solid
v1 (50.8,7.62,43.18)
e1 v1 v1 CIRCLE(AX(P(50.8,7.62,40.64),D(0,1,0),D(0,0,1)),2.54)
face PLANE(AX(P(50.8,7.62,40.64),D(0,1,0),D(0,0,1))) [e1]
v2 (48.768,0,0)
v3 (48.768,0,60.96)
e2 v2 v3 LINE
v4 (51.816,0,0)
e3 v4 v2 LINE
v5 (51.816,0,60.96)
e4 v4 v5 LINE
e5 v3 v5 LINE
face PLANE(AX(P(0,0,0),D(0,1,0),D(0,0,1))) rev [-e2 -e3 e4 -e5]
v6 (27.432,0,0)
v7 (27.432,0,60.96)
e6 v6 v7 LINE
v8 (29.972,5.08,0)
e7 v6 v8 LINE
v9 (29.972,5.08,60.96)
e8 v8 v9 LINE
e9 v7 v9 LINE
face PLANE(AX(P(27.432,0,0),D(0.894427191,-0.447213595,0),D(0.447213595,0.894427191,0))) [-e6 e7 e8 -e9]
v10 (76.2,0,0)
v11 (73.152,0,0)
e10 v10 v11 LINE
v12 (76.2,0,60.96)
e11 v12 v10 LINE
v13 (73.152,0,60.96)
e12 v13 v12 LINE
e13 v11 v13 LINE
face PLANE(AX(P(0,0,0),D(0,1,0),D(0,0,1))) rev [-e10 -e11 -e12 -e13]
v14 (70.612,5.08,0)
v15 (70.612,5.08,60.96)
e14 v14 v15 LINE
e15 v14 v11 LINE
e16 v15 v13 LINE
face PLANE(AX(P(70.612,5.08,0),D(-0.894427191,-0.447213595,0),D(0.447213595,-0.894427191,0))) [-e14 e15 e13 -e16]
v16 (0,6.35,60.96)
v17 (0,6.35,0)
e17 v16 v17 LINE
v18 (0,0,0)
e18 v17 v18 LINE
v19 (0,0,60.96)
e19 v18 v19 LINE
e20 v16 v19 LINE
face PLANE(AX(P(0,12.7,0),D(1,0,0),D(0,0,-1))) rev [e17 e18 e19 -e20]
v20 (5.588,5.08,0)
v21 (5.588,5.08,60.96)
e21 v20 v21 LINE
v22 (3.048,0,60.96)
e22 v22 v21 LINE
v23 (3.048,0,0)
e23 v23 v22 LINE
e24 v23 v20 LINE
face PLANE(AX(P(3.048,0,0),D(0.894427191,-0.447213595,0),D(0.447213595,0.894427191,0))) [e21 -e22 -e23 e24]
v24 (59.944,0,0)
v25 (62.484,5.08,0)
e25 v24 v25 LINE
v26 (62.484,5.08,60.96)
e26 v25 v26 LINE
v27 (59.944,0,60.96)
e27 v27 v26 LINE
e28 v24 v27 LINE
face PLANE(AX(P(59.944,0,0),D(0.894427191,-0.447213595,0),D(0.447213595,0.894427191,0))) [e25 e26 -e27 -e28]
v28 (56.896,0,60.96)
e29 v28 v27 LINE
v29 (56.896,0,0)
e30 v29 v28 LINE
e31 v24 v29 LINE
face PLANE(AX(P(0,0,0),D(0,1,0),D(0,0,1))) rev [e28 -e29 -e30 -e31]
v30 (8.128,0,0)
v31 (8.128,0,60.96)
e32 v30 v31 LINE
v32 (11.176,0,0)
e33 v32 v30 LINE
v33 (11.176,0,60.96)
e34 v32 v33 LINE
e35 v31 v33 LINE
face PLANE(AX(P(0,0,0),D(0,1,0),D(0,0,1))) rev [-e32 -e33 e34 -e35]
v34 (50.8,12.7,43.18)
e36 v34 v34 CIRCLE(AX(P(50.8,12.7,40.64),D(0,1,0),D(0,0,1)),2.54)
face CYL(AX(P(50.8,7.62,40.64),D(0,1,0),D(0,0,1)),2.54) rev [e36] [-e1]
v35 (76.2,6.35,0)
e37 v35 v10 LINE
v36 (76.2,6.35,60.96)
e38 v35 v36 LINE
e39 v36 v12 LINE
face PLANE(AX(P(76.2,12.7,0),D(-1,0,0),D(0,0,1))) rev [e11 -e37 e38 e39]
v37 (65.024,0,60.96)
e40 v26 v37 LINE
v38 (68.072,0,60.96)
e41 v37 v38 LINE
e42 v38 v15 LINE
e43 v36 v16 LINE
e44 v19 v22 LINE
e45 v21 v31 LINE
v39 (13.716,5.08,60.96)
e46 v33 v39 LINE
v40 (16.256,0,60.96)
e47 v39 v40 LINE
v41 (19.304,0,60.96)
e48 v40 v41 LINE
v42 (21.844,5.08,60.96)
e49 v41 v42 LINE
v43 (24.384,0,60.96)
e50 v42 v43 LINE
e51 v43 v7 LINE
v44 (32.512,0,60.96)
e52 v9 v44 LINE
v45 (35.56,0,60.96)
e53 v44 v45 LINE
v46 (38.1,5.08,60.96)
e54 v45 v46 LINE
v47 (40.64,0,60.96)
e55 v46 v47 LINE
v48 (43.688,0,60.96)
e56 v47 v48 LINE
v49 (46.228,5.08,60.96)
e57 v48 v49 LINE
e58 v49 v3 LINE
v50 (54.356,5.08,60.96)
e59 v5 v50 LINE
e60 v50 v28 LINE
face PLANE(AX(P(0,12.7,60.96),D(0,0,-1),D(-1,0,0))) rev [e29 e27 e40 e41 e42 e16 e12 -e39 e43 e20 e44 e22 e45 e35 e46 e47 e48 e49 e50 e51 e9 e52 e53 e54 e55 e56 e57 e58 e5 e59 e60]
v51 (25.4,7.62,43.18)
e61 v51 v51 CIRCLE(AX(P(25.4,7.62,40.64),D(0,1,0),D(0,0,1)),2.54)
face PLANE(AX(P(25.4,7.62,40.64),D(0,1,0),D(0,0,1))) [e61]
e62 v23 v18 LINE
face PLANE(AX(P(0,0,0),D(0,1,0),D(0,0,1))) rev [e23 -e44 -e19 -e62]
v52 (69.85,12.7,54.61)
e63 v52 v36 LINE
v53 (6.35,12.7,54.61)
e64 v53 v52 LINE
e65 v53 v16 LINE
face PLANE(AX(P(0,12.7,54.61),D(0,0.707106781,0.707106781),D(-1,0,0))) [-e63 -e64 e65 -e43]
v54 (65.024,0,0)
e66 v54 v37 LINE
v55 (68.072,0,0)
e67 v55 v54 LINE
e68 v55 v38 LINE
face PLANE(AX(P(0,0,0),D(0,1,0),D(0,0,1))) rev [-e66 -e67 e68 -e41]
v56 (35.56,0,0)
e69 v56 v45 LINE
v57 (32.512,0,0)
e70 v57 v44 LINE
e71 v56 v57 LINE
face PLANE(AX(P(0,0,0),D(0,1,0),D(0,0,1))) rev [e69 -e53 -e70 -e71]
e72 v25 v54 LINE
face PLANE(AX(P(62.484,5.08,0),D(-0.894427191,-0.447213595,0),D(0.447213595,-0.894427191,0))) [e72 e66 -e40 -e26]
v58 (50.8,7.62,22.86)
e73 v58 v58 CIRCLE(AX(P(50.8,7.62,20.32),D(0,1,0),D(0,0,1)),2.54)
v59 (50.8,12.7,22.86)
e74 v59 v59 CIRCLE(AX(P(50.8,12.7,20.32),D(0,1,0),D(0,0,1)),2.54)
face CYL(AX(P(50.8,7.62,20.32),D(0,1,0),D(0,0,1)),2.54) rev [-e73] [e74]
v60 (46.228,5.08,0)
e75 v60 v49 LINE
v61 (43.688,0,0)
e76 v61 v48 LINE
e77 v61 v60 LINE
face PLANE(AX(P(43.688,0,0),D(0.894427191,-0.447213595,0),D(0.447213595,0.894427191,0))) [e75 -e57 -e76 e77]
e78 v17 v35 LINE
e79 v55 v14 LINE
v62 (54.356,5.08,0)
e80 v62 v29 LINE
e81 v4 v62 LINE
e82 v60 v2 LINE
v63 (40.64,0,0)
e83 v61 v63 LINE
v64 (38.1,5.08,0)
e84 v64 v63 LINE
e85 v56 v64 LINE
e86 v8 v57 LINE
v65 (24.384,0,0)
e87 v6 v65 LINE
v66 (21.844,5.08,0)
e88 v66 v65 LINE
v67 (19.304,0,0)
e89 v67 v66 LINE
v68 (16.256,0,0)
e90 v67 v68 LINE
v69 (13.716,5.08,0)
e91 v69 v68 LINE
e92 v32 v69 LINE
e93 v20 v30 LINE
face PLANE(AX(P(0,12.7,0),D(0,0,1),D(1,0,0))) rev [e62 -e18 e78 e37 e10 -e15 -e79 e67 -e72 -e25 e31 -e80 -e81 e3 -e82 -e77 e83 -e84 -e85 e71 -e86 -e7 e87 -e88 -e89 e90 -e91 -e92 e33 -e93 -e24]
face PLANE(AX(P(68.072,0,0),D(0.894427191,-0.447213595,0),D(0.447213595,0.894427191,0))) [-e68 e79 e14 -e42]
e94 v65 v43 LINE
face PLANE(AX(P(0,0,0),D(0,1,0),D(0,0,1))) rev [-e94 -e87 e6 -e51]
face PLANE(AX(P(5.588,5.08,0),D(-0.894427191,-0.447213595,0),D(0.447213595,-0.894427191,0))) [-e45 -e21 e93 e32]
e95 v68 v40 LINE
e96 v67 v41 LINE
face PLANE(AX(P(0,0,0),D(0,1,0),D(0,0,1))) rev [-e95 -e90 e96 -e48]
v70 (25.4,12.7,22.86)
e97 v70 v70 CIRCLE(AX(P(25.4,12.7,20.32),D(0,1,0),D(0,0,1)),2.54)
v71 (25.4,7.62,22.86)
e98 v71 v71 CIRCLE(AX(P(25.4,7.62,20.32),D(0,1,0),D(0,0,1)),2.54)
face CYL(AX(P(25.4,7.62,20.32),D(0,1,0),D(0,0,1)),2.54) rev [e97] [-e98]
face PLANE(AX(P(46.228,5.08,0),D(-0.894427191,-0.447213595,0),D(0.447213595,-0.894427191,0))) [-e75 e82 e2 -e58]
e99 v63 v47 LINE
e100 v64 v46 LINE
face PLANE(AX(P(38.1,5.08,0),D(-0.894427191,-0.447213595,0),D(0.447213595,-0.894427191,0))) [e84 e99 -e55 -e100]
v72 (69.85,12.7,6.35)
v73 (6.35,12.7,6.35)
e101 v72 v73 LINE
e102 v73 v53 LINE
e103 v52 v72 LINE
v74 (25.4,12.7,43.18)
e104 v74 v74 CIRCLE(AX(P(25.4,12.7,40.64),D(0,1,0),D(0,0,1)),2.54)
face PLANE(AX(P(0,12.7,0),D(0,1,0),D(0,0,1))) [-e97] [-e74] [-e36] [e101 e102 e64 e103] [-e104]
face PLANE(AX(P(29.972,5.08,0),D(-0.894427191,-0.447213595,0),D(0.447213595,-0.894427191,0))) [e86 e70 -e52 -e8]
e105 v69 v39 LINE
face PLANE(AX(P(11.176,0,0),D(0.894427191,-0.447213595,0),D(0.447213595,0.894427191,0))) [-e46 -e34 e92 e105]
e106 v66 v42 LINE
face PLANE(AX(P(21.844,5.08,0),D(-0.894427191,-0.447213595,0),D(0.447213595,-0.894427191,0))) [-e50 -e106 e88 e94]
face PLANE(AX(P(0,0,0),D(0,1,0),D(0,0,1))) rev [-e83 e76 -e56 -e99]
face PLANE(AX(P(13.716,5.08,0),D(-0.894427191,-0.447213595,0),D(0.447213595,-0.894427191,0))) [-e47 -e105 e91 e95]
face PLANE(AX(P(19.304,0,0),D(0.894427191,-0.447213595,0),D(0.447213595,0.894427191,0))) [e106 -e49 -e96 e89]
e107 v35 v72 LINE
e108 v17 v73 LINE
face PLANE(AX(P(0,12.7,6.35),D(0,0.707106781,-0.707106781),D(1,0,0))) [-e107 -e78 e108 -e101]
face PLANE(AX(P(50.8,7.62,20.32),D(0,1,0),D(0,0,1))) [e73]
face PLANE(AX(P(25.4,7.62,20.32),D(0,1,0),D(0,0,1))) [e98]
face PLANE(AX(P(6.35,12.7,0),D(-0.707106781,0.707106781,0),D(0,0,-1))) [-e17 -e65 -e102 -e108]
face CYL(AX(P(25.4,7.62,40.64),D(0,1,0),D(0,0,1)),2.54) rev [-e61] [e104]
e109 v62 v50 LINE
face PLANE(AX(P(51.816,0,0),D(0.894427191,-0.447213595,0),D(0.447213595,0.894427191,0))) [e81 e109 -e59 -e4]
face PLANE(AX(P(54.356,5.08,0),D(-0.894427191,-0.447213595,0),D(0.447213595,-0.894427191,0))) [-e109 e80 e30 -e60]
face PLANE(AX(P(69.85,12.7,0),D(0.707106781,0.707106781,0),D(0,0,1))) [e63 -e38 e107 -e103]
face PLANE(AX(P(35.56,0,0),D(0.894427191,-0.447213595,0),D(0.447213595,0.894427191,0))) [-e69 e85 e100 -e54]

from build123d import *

# Parameters (mm, degrees)
SKETCH1_W           = 76.2
SKETCH1_H           = 60.96
BOSS_EXTRUDE1_DEPTH = 12.7
CHAMFER1_SIZE       = 6.35
CUT_EXTRUDE1_DEPTH  = 99.406562789
CRVPATTERN1_DEPTH   = 60.96
SKETCH3_R           = 2.54
CUT_EXTRUDE2_DEPTH  = 5.08


# Read off the part's stored shape, not the designer's step: CrvPattern1
with BuildPart() as part:
    # Sketch1 → Boss-Extrude1 (new body)
    with BuildSketch(Plane(origin=(0, 0, 0), x_dir=(1, 0, 0), z_dir=(0, 1, 0))):
        with Locations((38.1, -30.48)):
            Rectangle(SKETCH1_W, SKETCH1_H)
    extrude(amount=BOSS_EXTRUDE1_DEPTH)

    # Chamfer1
    chamfer1_edges = [part.edges().sort_by_distance(p)[0] for p in [
        (76.2, 12.7, 30.48),
        (38.1, 12.7, 0),
        (0, 12.7, 30.48),
        (38.1, 12.7, 60.96),
    ]]
    chamfer(chamfer1_edges, length=CHAMFER1_SIZE)

    # Sketch2 → Cut-Extrude1 (cut, through all)
    with BuildSketch(Plane.XY.offset(60.96)):
        Polygon((3.048, 0), (5.588, 5.08), (8.128, 0), align=None)
    extrude(amount=-CUT_EXTRUDE1_DEPTH, mode=Mode.SUBTRACT)

    # CrvPattern1 outline → CrvPattern1 (cut)
    with BuildSketch(Plane.XY):
        Polygon((70.612, 5.08), (68.072, 0), (73.152, 0), align=None)
        Polygon((62.484, 5.08), (59.944, 0), (65.024, 0), align=None)
        Polygon((54.356, 5.08), (51.816, 0), (56.896, 0), align=None)
        Polygon((46.228, 5.08), (43.688, 0), (48.768, 0), align=None)
        Polygon((38.1, 5.08), (35.56, 0), (40.64, 0), align=None)
        Polygon((29.972, 5.08), (27.432, 0), (32.512, 0), align=None)
        Polygon((21.844, 5.08), (19.304, 0), (24.384, 0), align=None)
        Polygon((13.716, 5.08), (11.176, 0), (16.256, 0), align=None)
    extrude(amount=CRVPATTERN1_DEPTH, mode=Mode.SUBTRACT)

    # Sketch3 → Cut-Extrude2 (cut)
    with BuildSketch(Plane(origin=(0, 12.7, 0), x_dir=(1, 0, 0), z_dir=(0, 1, 0))):
        with Locations(Location((25.4, -20.32, 0), (0, 0, 270))):
            Circle(SKETCH3_R)
        with Locations(Location((50.8, -20.32, 0), (0, 0, 270))):
            Circle(SKETCH3_R)
        with Locations(Location((25.4, -40.64, 0), (0, 0, 270))):
            Circle(SKETCH3_R)
        with Locations(Location((50.8, -40.64, 0), (0, 0, 270))):
            Circle(SKETCH3_R)
    extrude(amount=-CUT_EXTRUDE2_DEPTH, mode=Mode.SUBTRACT)


solid = part.part
